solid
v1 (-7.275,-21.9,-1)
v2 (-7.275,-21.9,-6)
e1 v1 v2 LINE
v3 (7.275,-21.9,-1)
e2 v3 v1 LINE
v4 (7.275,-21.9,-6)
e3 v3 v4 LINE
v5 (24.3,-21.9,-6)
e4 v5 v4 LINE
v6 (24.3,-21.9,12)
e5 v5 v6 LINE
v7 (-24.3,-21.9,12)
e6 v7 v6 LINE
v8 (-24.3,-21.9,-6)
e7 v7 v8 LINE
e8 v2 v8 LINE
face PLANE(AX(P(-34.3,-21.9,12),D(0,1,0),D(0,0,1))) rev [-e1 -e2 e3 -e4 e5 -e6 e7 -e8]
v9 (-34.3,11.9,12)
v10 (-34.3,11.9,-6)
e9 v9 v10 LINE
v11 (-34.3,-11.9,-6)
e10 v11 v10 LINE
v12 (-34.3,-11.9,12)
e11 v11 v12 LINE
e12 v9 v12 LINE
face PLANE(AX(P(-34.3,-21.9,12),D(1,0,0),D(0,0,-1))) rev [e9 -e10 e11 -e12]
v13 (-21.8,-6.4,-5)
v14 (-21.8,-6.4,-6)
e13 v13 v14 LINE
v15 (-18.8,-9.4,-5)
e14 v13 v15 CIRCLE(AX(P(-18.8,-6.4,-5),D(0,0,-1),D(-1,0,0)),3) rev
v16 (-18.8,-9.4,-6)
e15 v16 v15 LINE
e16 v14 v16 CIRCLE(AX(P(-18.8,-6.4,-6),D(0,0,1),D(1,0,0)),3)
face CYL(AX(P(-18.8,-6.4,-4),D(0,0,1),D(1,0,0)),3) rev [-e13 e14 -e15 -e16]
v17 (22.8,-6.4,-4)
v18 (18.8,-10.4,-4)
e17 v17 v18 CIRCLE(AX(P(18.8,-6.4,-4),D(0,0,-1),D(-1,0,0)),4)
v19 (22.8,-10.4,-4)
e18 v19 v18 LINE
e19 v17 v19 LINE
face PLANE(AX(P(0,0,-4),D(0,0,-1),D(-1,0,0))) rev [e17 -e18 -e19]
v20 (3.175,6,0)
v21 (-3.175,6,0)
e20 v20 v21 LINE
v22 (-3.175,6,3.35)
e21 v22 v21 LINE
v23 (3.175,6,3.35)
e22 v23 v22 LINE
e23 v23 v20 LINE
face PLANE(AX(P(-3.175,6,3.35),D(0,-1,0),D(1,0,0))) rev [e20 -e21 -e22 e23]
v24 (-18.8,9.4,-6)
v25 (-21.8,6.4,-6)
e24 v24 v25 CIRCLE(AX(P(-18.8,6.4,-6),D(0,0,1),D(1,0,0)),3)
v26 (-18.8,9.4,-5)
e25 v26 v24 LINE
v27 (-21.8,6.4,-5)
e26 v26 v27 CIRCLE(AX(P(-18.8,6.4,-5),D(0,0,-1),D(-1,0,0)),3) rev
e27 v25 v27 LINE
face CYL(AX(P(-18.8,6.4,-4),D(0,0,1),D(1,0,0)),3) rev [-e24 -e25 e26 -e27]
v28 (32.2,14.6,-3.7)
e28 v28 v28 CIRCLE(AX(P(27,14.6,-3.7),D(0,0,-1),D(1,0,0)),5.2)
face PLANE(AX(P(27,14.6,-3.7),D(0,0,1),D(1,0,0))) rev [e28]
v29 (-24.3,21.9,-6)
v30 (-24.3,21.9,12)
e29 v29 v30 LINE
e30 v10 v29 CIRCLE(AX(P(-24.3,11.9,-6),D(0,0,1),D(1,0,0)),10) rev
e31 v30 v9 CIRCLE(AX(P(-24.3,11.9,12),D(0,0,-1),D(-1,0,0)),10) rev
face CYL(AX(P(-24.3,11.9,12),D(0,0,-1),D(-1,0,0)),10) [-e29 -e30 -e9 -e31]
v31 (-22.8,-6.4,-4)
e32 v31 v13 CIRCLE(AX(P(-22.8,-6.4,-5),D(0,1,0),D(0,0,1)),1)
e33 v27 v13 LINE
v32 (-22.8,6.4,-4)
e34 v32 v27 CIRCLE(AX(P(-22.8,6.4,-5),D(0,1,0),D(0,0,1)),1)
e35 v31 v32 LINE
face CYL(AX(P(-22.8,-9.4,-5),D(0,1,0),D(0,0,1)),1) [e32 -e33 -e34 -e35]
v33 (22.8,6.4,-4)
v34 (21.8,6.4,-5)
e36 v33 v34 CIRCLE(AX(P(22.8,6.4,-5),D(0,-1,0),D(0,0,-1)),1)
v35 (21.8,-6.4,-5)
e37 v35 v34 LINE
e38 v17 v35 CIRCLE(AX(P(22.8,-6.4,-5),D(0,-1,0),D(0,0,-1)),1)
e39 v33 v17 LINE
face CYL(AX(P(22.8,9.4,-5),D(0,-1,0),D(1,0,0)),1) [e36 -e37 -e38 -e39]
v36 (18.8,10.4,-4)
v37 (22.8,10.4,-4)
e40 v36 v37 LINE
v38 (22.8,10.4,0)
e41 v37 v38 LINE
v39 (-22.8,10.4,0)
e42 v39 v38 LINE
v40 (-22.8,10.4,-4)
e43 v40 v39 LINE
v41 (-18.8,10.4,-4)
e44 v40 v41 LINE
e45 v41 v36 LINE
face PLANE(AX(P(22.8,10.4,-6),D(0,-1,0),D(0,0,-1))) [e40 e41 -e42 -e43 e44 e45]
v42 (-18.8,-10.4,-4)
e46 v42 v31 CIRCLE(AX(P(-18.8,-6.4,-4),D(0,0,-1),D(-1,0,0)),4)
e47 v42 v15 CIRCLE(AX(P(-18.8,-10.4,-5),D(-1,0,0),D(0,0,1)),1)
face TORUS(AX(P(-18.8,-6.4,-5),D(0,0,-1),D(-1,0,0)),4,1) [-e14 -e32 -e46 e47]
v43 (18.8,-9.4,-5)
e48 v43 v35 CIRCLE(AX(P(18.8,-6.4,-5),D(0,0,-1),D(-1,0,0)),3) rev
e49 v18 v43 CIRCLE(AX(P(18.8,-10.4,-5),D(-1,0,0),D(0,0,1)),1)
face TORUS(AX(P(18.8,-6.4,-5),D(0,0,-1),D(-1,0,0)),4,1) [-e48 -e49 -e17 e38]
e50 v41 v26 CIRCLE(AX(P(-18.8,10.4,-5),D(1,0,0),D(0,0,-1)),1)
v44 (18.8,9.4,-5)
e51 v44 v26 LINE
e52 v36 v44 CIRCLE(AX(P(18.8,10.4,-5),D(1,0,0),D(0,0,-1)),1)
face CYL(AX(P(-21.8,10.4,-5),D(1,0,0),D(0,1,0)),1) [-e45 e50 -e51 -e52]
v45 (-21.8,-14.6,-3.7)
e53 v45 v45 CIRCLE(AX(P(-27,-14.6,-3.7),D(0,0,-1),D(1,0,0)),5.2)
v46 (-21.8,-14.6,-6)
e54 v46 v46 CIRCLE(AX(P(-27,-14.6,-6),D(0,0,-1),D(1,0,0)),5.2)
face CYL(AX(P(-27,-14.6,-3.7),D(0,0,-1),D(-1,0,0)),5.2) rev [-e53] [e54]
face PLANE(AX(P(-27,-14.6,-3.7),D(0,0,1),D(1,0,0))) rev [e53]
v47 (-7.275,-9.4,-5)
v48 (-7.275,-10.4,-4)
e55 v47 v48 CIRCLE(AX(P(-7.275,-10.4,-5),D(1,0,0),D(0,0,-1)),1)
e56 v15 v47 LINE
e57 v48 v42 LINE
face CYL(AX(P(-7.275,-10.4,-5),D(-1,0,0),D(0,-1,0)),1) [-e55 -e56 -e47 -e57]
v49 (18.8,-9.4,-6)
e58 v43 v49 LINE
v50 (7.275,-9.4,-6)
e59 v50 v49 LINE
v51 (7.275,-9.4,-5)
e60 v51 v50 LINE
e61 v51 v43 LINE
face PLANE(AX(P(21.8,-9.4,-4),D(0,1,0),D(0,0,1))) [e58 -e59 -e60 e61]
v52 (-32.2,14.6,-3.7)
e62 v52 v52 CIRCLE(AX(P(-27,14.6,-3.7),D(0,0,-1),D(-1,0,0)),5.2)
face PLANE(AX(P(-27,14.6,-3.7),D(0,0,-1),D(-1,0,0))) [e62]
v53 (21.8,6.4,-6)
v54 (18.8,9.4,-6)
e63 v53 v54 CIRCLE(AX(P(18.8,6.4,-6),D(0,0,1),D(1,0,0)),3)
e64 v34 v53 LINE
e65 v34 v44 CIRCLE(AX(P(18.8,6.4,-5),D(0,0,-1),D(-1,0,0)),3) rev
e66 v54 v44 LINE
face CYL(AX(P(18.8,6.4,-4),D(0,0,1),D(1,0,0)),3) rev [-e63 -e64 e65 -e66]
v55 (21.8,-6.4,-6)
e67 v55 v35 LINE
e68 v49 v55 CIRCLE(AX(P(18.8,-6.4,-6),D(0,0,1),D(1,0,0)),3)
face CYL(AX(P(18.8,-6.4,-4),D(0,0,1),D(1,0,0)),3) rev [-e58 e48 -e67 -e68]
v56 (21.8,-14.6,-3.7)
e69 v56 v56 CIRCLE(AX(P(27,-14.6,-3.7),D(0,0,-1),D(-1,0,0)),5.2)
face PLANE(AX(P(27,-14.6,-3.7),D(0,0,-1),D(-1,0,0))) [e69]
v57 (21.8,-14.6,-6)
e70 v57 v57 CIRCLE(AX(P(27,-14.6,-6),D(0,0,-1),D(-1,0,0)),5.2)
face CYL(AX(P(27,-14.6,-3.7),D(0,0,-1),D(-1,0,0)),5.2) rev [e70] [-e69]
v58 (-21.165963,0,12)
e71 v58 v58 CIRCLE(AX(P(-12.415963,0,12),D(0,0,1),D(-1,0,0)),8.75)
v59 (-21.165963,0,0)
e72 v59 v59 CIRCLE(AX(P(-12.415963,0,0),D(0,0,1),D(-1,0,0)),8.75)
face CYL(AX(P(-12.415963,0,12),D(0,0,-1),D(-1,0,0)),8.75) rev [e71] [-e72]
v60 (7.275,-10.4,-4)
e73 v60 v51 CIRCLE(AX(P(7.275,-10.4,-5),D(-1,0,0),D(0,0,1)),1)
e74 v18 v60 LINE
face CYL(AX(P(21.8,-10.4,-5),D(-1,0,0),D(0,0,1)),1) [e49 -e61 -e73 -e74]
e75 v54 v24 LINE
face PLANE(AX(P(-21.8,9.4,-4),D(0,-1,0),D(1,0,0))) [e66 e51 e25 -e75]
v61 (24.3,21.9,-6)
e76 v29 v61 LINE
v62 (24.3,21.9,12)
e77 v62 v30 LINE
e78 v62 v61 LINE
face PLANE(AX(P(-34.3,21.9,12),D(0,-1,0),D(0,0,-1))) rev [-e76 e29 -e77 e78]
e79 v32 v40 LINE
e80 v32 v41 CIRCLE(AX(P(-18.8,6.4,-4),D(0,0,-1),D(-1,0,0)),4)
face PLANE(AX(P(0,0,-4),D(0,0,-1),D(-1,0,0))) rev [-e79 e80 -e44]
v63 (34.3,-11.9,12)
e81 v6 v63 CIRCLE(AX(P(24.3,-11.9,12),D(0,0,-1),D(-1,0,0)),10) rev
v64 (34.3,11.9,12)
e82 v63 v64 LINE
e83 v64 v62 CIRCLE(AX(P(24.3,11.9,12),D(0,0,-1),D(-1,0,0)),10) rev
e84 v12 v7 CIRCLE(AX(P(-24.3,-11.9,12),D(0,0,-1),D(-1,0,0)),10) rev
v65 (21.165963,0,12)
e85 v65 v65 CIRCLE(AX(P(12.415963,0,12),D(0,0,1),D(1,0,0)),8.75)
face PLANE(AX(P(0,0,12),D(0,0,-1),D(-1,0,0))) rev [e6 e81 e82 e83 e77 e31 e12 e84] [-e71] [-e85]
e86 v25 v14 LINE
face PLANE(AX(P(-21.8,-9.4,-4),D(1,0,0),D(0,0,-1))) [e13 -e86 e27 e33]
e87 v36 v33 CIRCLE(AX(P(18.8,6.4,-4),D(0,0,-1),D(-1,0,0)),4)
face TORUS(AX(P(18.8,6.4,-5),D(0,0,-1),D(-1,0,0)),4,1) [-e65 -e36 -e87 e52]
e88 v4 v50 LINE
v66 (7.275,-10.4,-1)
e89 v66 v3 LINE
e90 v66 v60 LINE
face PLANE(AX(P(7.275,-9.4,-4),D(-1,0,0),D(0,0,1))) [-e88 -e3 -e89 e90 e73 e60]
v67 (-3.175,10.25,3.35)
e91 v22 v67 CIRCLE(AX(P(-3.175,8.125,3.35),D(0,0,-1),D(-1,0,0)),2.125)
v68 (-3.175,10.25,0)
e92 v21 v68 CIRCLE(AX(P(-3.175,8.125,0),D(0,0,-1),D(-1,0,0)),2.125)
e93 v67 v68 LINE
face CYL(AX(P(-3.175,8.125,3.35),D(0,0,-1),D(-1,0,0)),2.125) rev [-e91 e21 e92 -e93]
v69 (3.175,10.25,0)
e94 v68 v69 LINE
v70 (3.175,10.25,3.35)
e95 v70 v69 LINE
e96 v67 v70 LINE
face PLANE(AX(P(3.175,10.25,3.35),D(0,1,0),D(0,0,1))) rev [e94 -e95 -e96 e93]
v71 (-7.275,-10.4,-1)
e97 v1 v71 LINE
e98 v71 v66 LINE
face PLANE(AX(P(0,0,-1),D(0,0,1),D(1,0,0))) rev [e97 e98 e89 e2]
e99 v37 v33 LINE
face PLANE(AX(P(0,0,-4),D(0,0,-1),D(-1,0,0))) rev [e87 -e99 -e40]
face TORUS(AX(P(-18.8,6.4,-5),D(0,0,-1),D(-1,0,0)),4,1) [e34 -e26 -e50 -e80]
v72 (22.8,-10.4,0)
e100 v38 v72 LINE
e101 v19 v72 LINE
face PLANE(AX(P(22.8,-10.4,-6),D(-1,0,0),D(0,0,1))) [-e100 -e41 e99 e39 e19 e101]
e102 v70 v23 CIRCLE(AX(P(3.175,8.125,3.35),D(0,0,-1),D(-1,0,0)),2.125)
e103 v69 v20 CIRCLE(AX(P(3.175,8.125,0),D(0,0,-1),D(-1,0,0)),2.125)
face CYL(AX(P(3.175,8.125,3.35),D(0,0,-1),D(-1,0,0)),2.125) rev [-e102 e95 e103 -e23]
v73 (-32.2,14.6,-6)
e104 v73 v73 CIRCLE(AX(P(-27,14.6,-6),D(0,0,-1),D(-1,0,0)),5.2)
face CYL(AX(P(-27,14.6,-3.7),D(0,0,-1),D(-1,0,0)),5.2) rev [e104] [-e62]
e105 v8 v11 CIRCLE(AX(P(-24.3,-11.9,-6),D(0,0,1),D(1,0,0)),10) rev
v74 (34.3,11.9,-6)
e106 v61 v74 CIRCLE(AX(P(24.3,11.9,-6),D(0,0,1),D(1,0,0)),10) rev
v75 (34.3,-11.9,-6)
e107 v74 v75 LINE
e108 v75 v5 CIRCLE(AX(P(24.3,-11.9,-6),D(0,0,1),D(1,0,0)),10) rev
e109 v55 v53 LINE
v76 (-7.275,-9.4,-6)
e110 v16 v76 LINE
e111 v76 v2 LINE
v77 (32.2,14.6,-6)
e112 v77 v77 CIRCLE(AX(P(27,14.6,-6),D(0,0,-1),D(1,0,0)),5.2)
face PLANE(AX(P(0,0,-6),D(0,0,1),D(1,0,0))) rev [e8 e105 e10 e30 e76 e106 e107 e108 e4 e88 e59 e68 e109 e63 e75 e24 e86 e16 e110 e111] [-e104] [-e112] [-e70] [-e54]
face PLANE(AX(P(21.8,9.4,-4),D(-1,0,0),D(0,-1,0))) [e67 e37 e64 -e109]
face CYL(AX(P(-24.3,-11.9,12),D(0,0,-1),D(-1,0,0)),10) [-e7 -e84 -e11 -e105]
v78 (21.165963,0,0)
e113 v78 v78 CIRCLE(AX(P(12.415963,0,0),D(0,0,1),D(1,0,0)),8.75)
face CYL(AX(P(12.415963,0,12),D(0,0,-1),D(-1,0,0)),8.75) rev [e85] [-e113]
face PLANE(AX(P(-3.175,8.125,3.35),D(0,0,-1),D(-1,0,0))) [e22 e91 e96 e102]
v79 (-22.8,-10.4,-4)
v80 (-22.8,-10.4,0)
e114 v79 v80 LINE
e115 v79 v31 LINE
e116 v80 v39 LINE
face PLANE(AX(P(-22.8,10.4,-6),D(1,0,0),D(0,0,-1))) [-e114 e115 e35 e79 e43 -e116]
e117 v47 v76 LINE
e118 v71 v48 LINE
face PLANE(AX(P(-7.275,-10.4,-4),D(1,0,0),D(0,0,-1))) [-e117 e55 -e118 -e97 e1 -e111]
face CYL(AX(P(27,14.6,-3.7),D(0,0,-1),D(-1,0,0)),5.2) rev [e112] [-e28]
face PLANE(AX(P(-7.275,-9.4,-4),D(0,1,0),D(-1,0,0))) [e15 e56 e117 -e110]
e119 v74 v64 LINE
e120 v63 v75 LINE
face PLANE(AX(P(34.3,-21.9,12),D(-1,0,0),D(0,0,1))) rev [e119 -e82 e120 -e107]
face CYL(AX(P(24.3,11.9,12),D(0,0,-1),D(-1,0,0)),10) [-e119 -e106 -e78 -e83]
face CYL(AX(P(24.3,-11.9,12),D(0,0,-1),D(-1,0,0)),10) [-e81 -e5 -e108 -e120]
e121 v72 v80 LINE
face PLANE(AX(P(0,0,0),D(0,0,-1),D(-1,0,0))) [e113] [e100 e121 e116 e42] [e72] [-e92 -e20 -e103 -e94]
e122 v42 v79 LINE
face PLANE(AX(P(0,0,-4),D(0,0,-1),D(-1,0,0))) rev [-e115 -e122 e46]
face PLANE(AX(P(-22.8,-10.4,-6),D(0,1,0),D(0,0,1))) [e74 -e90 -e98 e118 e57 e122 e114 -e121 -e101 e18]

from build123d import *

# Parameters (mm, degrees)
SKETCH1_W           = 68.6
SKETCH1_H           = 43.8
SKETCH1_R           = 8.75
BOSS_EXTRUDE1_DEPTH = 12
CUT_EXTRUDE1_DEPTH  = 3.35
SKETCH3_W           = 68.6
SKETCH3_H           = 43.8
SKETCH3_W_2         = 45.6
SKETCH3_H_2         = 20.8
BOSS_EXTRUDE2_DEPTH = 6
FILLET1_R           = 10
SKETCH4_R           = 5.2
CUT_EXTRUDE2_DEPTH  = 2.3
BOSS_EXTRUDE6_DEPTH = 2
FILLET2_R           = 3
FILLET3_R           = 1
SKETCH7_W           = 14.55
SKETCH7_H           = 11.5
CUT_EXTRUDE3_DEPTH  = 5


with BuildPart() as part:
    # Sketch1 → Boss-Extrude1 (new body)
    with BuildSketch(Plane.XY):
        Rectangle(SKETCH1_W, SKETCH1_H)
        with Locations((12.415962636, 0)):
            Circle(SKETCH1_R, mode=Mode.SUBTRACT)
        with Locations(Location((-12.415962636, 0, 0), (0, 0, 180))):
            Circle(SKETCH1_R, mode=Mode.SUBTRACT)
    extrude(amount=BOSS_EXTRUDE1_DEPTH)

    # Sketch2 → Cut-Extrude1 (cut)
    with BuildSketch(Plane(origin=(0, 0, 0), x_dir=(-1, 0, 0), z_dir=(0, 0, -1))):
        with BuildLine():
            Line((3.175, 6), (-3.175, 6))
            ThreePointArc((-3.175, 6), (-5.3, 8.125), (-3.175, 10.25))
            Line((-3.175, 10.25), (3.175, 10.25))
            ThreePointArc((3.175, 10.25), (5.3, 8.125), (3.175, 6))
        make_face()
    extrude(amount=-CUT_EXTRUDE1_DEPTH, mode=Mode.SUBTRACT)

    # Sketch3 → Boss-Extrude2 (add)
    with BuildSketch(Plane(origin=(0, 0, 0), x_dir=(-1, 0, 0), z_dir=(0, 0, -1))):
        Rectangle(SKETCH3_W, SKETCH3_H)
        Rectangle(SKETCH3_W_2, SKETCH3_H_2, mode=Mode.SUBTRACT)
    extrude(amount=BOSS_EXTRUDE2_DEPTH)

    # Fillet1
    fillet1_edges = [part.edges().sort_by_distance(p)[0] for p in [
        (34.3, -21.9, 3),
        (-34.3, -21.9, 3),
        (-34.3, 21.9, 3),
        (34.3, 21.9, 3),
    ]]
    fillet(fillet1_edges, radius=FILLET1_R)

    # Sketch4 → Cut-Extrude2 (cut)
    with BuildSketch(Plane(origin=(0, 0, -6), x_dir=(-1, 0, 0), z_dir=(0, 0, -1))):
        with Locations((27, 14.6)):
            Circle(SKETCH4_R)
        with Locations(Location((-27, 14.6, 0), (0, 0, 180))):
            Circle(SKETCH4_R)
        with Locations(Location((27, -14.6, 0), (0, 0, 180))):
            Circle(SKETCH4_R)
        with Locations((-27, -14.6)):
            Circle(SKETCH4_R)
    extrude(amount=-CUT_EXTRUDE2_DEPTH, mode=Mode.SUBTRACT)

    # Sketch6 → Boss-Extrude6 (add)
    with BuildSketch(Plane(origin=(0, 0, -6), x_dir=(-1, 0, 0), z_dir=(0, 0, -1))):
        Polygon((-22.8, -10.4), (-7.275, -10.4), (-7.275, -9.4), (-21.8, -9.4), (-21.8, 9.4), (21.8, 9.4), (21.8, -9.4), (7.275, -9.4), (7.275, -10.4), (22.8, -10.4), (22.8, 10.4), (-22.8, 10.4), align=None)
    extrude(amount=-BOSS_EXTRUDE6_DEPTH)

    # Fillet2
    fillet2_edges = [part.edges().sort_by_distance(p)[0] for p in [
        (-21.8, -9.4, -5),
        (-21.8, 9.4, -5),
        (21.8, 9.4, -5),
        (21.8, -9.4, -5),
    ]]
    fillet(fillet2_edges, radius=FILLET2_R)

    # Fillet3
    fillet3_edges = [part.edges().sort_by_distance(p)[0] for p in [
        (13.0375, -9.4, -4),
        (20.921320344, -8.521320344, -4),
        (21.8, 0, -4),
        (20.921320344, 8.521320344, -4),
        (0, 9.4, -4),
        (-20.921320344, 8.521320344, -4),
        (-13.0375, -9.4, -4),
        (-20.921320344, -8.521320344, -4),
        (-21.8, 0, -4),
    ]]
    fillet(fillet3_edges, radius=FILLET3_R - 0.0001)  # a hair under: the kernel refuses the full size

    # Sketch7 → Cut-Extrude3 (cut)
    with BuildSketch(Plane(origin=(0, 0, -6), x_dir=(-1, 0, 0), z_dir=(0, 0, -1))):
        with Locations((0, -16.15)):
            Rectangle(SKETCH7_W, SKETCH7_H)
    extrude(amount=-CUT_EXTRUDE3_DEPTH, mode=Mode.SUBTRACT)


solid = part.part
